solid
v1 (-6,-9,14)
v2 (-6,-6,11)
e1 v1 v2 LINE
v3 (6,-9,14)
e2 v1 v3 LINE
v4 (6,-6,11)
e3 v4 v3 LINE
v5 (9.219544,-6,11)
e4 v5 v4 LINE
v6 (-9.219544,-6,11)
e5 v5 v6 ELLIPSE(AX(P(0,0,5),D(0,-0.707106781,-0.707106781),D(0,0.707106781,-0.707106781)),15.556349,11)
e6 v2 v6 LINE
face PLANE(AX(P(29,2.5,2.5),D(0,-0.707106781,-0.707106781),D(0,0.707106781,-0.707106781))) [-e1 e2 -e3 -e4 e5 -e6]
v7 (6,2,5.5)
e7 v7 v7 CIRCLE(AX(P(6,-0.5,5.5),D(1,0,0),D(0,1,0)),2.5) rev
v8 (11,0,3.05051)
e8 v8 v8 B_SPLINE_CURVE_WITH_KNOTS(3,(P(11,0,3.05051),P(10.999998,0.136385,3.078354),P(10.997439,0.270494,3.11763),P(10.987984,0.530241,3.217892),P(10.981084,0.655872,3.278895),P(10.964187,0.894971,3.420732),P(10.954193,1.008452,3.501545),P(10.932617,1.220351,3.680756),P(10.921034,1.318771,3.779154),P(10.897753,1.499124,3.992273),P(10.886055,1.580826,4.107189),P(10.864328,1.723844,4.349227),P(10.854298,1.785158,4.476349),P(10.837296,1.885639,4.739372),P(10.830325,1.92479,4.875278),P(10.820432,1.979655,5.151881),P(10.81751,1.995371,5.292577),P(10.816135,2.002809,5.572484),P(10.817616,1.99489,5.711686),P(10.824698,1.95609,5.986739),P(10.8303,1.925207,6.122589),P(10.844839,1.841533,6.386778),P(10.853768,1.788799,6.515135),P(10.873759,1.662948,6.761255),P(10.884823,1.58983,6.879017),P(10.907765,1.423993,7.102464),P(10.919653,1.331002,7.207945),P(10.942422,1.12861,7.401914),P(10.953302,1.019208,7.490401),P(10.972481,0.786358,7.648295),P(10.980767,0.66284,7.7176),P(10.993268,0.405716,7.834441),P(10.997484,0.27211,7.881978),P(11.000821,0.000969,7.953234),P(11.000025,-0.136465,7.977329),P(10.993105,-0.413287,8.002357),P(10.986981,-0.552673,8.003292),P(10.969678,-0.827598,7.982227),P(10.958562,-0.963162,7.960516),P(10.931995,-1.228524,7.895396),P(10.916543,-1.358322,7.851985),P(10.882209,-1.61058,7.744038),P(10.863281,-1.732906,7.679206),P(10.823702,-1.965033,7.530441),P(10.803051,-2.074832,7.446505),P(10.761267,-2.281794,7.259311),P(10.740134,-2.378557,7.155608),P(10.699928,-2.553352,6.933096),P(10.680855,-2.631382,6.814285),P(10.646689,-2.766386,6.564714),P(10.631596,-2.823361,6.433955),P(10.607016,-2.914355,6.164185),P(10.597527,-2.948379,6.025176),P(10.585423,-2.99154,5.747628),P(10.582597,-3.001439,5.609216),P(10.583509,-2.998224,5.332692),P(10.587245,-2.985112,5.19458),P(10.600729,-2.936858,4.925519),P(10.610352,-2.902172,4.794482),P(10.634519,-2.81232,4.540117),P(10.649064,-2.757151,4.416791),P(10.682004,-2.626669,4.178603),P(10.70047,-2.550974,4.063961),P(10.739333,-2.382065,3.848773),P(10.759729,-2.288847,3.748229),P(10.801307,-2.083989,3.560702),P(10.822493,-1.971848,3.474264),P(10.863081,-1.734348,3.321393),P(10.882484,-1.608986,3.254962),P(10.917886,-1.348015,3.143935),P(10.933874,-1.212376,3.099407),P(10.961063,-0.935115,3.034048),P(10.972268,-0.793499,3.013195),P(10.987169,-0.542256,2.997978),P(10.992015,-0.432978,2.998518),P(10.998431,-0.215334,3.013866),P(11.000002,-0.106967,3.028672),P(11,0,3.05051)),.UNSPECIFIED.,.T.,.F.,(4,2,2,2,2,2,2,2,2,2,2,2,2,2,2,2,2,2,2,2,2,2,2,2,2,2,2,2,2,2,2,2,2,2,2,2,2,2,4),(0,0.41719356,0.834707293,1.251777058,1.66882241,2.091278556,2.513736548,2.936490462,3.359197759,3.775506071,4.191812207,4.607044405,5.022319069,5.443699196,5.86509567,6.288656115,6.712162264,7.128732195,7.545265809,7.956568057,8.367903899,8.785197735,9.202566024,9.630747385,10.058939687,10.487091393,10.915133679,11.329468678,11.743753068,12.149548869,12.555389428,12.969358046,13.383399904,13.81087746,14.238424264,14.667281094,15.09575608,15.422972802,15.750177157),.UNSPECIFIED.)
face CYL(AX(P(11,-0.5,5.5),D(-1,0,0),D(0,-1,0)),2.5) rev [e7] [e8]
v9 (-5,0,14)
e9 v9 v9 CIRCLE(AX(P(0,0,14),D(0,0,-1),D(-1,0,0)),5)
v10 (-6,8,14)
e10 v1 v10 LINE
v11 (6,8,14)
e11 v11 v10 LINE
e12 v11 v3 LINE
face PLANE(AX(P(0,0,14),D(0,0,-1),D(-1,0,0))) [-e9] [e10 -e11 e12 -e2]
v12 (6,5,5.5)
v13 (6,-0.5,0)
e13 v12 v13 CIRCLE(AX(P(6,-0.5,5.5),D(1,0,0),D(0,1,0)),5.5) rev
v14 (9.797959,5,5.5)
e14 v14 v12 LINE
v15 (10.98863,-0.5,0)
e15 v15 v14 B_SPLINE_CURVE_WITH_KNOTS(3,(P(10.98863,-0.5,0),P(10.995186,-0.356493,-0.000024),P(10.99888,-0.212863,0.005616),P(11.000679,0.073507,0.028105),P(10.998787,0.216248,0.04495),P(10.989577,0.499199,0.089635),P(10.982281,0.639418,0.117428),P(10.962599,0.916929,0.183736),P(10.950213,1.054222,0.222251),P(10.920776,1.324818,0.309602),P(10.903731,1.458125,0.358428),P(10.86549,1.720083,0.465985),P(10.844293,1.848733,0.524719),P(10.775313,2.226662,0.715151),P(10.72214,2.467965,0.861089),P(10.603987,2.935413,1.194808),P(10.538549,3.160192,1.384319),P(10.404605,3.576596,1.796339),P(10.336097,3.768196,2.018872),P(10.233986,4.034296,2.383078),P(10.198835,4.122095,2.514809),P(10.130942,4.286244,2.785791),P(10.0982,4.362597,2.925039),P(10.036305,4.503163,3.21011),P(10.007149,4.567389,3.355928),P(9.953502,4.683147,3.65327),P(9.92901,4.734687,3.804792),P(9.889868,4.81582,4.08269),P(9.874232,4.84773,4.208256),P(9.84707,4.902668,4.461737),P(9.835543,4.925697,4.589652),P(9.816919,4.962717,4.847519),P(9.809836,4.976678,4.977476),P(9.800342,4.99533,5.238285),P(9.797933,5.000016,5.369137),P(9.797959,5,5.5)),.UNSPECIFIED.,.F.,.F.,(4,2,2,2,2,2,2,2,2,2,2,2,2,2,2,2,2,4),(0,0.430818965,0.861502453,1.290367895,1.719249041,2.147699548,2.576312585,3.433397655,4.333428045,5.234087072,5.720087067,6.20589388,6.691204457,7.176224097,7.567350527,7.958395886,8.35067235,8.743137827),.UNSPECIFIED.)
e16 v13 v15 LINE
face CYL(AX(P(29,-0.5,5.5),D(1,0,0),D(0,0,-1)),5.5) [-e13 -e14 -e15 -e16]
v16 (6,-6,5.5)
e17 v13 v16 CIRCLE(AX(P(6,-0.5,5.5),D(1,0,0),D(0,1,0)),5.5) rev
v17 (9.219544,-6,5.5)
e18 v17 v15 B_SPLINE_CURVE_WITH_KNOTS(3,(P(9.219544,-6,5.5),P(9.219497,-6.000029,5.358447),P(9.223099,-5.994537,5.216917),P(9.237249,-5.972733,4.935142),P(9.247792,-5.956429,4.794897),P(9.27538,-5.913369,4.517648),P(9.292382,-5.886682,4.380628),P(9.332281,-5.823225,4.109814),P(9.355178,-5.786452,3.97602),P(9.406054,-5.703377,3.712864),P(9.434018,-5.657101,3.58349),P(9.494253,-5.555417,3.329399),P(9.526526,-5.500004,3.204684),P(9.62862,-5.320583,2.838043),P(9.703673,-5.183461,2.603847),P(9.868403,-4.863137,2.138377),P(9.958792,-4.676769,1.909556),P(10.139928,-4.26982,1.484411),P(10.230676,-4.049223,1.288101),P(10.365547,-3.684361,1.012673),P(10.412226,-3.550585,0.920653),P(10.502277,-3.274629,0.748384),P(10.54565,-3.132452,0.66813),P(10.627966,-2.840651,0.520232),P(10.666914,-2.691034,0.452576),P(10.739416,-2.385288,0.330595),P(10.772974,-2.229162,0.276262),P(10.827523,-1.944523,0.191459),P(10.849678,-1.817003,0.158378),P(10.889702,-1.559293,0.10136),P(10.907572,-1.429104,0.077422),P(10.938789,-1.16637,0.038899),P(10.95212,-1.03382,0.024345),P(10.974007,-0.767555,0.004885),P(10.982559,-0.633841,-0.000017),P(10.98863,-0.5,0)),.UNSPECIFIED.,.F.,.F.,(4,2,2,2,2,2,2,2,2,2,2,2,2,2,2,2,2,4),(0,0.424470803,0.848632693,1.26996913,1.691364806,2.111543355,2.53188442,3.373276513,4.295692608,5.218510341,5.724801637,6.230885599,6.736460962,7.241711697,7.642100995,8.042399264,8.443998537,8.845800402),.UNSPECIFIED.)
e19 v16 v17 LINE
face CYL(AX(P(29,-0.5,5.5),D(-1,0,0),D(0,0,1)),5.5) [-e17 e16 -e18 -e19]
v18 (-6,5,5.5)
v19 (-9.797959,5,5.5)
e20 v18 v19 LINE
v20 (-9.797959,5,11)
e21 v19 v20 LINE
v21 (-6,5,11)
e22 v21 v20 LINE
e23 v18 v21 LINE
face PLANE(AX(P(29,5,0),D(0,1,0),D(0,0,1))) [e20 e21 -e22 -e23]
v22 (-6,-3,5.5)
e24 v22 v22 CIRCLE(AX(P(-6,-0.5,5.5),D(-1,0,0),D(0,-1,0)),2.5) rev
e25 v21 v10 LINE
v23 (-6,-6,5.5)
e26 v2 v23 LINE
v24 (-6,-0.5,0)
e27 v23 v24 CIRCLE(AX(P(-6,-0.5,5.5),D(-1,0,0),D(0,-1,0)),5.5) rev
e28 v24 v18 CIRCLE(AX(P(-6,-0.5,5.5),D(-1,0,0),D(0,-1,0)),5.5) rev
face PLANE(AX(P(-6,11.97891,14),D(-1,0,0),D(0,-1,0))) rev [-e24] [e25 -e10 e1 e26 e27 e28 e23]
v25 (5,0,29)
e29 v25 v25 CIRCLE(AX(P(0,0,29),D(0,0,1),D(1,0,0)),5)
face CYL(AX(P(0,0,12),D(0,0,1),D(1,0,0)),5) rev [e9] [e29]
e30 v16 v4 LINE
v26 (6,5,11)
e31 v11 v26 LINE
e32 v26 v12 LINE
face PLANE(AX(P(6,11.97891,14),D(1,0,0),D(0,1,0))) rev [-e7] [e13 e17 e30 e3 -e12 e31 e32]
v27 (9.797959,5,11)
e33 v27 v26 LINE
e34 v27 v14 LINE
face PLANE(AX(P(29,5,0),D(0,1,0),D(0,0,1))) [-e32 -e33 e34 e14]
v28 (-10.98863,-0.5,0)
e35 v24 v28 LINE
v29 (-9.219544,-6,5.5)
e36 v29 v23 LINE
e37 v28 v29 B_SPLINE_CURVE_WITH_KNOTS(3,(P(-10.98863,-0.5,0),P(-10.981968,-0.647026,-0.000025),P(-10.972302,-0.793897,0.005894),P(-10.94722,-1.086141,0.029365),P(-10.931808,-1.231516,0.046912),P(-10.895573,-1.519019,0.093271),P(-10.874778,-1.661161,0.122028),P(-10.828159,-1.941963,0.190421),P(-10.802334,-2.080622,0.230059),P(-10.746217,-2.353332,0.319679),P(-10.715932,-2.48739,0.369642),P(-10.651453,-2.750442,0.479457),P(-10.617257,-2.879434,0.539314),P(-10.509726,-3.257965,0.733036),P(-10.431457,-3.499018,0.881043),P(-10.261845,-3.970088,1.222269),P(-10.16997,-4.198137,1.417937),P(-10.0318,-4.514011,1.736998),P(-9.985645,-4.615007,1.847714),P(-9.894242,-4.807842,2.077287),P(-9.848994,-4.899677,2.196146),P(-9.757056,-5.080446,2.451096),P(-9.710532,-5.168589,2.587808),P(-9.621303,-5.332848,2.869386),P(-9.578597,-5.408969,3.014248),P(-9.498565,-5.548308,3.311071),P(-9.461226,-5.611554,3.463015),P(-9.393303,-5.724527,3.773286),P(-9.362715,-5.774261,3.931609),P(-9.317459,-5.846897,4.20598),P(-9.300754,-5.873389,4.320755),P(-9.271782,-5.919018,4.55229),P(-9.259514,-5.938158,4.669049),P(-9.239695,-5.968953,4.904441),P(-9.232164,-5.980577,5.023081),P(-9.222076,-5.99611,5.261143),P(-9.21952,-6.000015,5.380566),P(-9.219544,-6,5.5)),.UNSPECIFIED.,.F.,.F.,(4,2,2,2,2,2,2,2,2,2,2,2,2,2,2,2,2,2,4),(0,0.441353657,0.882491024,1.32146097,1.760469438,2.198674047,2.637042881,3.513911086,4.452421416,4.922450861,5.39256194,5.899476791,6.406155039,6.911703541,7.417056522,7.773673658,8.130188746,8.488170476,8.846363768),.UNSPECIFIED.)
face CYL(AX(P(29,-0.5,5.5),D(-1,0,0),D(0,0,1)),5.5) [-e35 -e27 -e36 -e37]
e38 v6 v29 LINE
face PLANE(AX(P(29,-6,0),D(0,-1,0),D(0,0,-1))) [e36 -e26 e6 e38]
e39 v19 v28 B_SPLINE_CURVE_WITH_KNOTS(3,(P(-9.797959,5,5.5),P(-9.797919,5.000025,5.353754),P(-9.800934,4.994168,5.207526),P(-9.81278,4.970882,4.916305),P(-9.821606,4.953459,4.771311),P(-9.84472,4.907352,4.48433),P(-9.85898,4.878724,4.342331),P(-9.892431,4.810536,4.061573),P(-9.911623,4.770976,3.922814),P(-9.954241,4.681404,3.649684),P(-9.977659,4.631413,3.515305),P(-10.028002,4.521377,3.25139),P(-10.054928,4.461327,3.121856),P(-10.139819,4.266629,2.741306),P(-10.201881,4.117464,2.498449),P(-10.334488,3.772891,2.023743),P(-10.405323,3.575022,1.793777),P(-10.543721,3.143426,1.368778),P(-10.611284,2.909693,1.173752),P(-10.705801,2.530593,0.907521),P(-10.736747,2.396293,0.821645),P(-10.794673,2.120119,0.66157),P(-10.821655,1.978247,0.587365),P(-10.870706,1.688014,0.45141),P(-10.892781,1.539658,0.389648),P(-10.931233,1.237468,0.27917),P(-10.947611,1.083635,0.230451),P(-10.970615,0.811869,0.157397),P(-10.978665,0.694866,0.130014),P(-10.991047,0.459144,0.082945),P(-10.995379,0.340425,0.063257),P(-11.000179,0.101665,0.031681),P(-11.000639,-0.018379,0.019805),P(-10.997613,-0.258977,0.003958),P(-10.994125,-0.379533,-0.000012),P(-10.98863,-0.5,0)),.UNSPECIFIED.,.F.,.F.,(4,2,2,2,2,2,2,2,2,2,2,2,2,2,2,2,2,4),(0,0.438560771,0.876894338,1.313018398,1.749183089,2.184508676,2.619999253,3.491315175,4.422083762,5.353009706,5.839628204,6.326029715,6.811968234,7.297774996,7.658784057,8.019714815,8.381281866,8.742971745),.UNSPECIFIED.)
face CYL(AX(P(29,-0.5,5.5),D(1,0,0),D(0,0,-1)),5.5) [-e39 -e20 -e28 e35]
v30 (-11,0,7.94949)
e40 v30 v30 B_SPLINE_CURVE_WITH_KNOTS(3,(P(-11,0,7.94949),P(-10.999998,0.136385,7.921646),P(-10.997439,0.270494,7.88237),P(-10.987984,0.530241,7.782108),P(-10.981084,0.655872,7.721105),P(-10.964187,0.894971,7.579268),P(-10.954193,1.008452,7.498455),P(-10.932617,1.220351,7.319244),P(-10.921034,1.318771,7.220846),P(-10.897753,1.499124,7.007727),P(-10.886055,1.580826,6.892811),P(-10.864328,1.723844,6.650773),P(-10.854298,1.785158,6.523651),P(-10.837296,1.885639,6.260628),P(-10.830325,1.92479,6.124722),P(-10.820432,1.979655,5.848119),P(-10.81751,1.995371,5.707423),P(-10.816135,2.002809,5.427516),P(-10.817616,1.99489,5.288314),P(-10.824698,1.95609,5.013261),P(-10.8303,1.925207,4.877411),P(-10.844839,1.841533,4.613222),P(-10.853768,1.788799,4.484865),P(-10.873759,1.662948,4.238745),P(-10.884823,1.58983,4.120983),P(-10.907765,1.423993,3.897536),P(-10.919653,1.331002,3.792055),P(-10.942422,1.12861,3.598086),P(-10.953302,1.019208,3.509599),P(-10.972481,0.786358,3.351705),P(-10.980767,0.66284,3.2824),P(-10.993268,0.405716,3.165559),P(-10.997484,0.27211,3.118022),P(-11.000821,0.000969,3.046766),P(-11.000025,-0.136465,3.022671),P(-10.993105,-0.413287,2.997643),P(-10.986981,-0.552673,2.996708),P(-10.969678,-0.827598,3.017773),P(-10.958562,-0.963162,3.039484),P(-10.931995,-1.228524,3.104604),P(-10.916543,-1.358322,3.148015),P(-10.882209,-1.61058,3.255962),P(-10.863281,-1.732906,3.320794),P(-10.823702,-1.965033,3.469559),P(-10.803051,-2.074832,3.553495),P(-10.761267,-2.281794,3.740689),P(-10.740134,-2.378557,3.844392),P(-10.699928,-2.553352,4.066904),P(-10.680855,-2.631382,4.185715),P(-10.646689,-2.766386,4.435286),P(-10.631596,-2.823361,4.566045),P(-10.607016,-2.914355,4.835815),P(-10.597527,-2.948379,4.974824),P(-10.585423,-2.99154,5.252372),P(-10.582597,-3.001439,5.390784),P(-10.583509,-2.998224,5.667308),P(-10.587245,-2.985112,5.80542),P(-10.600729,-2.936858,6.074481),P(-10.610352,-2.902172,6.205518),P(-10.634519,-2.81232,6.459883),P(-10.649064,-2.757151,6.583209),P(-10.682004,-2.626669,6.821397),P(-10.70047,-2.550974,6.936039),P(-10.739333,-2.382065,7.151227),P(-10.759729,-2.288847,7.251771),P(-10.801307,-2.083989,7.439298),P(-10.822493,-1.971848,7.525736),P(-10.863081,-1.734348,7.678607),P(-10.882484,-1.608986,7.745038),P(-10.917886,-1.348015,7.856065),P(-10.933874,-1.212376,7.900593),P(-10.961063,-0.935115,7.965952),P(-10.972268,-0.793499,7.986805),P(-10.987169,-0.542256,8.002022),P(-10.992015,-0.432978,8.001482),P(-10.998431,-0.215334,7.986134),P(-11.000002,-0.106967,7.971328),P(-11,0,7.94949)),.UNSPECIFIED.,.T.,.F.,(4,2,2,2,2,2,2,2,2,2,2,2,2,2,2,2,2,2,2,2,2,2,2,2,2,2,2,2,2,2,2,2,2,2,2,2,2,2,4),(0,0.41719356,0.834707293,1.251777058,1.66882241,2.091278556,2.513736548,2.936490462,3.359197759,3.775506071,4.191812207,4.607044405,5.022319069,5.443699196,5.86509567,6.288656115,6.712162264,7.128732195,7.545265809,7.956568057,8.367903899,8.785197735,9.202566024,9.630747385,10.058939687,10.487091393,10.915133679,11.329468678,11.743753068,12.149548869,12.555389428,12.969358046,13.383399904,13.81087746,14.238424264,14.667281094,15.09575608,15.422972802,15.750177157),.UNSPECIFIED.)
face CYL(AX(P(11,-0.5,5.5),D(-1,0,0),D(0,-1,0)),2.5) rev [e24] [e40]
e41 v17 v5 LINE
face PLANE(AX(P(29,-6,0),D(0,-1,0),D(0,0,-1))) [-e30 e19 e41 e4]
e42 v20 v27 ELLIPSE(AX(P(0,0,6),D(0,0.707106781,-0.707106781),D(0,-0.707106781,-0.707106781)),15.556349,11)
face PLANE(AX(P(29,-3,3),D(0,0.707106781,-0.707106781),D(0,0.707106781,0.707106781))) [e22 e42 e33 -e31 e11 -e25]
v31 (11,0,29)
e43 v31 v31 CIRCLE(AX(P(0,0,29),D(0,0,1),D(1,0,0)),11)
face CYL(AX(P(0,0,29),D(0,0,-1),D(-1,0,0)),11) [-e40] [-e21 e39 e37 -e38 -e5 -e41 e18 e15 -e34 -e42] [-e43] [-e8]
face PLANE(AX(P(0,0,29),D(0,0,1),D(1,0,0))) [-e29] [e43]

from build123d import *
from OCP.BRepAlgoAPI import BRepAlgoAPI_Cut
from OCP.TopTools import TopTools_ListOfShape

# Parameters (mm, degrees)
SKETCH_1_R               = 11
EXTRUDE_1_DEPTH          = 29
CUT_EXTRUDE_1_DEPTH      = 29
CUT_EXTRUDE_1_DEPTH_BACK = 29
SKETCH_3_W               = 12
SKETCH_3_H               = 23.957820674
CUT_EXTRUDE_2_DEPTH      = 14
FILLET_START             = -11
FILLET_1_DEPTH           = 21.999997277
SKETCH_4_R               = 5
CUT_EXTRUDE_3_DEPTH      = 17
CUT_EXTRUDE_4_DEPTH      = 17
CUT_EXTRUDE_4_DEPTH_BACK = 17
SKETCH_5_R               = 2.5


with BuildPart() as part:
    # 草图1 → 凸台-拉伸1 (new body)
    with BuildSketch(Plane.XY):
        with Locations(Location((0, 0, 0), (0, 0, 180))):
            Circle(SKETCH_1_R)
    extrude(amount=EXTRUDE_1_DEPTH)

    # 草图2 → 切除-拉伸1 (cut, two sides: drawn at the far end of the back side and taken through both)
    with BuildSketch(Plane(origin=(0, 0, 0), x_dir=(0, 0, -1), z_dir=(1, 0, 0)).offset(-CUT_EXTRUDE_1_DEPTH_BACK)):
        Polygon((0, 5), (0, 11), (-17, 11), (-11, 5), align=None)
        Polygon((-17, -12), (0, -12), (0, -6), (-11, -6), align=None)
    extrude(amount=CUT_EXTRUDE_1_DEPTH + CUT_EXTRUDE_1_DEPTH_BACK, mode=Mode.SUBTRACT)

    # 草图3 → 切除-拉伸2 (cut)
    with BuildSketch(Plane(origin=(0, 0, 0), x_dir=(-1, 0, 0), z_dir=(0, 0, -1))):
        Rectangle(SKETCH_3_W, SKETCH_3_H)
    extrude(amount=-CUT_EXTRUDE_2_DEPTH, mode=Mode.SUBTRACT)


with BuildPart() as fillet_1_tool:
    # 圆角1: read off the stored shape, not the designer's step
    # 圆角1 outline → 圆角1 (new body)
    with BuildSketch(Plane.YZ.offset(FILLET_START)):
        with BuildLine():
            Line((-6, 0), (-0.5, 0))
            ThreePointArc((-0.5, 0), (-4.389087297, 1.610912703), (-6, 5.5))
            Line((-6, 5.5), (-6, 0))
        make_face()
        with BuildLine():
            ThreePointArc((5, 5.5), (3.389087297, 1.610912703), (-0.5, 0))
            Line((-0.5, 0), (5, 0))
            Line((5, 0), (5, 5.5))
        make_face()
    extrude(amount=FILLET_1_DEPTH)


with BuildPart() as part_1:
    add(part.part)

    # 圆角1: cut by fillet_1_tool, with a tolerance
    fillet_1_stock = TopTools_ListOfShape()
    fillet_1_stock.Append(part_1.part.wrapped)
    fillet_1_tools = TopTools_ListOfShape()
    fillet_1_tools.Append(fillet_1_tool.part.wrapped)
    fillet_1_cut = BRepAlgoAPI_Cut()
    fillet_1_cut.SetArguments(fillet_1_stock)
    fillet_1_cut.SetTools(fillet_1_tools)
    fillet_1_cut.SetFuzzyValue(0.00001)
    fillet_1_cut.Build()
    add(Compound.cast(fillet_1_cut.Shape()).solids(), mode=Mode.REPLACE)

    # 草图4 → 切除-拉伸3 (cut)
    with BuildSketch(Plane.XY.offset(29)):
        Circle(SKETCH_4_R)
    extrude(amount=-CUT_EXTRUDE_3_DEPTH, mode=Mode.SUBTRACT)

    # 草图5 → 切除-拉伸4 (cut, two sides: drawn at the far end of the back side and taken through both)
    with BuildSketch(Plane(origin=(-6, 0, 0), x_dir=(0, 0, -1), z_dir=(1, 0, 0)).offset(-CUT_EXTRUDE_4_DEPTH_BACK)):
        with Locations(Location((-5.5, -0.5, 0), (0, 0, 11.536959033))):
            Circle(SKETCH_5_R)
    extrude(amount=CUT_EXTRUDE_4_DEPTH + CUT_EXTRUDE_4_DEPTH_BACK, mode=Mode.SUBTRACT)


solid = part_1.part
